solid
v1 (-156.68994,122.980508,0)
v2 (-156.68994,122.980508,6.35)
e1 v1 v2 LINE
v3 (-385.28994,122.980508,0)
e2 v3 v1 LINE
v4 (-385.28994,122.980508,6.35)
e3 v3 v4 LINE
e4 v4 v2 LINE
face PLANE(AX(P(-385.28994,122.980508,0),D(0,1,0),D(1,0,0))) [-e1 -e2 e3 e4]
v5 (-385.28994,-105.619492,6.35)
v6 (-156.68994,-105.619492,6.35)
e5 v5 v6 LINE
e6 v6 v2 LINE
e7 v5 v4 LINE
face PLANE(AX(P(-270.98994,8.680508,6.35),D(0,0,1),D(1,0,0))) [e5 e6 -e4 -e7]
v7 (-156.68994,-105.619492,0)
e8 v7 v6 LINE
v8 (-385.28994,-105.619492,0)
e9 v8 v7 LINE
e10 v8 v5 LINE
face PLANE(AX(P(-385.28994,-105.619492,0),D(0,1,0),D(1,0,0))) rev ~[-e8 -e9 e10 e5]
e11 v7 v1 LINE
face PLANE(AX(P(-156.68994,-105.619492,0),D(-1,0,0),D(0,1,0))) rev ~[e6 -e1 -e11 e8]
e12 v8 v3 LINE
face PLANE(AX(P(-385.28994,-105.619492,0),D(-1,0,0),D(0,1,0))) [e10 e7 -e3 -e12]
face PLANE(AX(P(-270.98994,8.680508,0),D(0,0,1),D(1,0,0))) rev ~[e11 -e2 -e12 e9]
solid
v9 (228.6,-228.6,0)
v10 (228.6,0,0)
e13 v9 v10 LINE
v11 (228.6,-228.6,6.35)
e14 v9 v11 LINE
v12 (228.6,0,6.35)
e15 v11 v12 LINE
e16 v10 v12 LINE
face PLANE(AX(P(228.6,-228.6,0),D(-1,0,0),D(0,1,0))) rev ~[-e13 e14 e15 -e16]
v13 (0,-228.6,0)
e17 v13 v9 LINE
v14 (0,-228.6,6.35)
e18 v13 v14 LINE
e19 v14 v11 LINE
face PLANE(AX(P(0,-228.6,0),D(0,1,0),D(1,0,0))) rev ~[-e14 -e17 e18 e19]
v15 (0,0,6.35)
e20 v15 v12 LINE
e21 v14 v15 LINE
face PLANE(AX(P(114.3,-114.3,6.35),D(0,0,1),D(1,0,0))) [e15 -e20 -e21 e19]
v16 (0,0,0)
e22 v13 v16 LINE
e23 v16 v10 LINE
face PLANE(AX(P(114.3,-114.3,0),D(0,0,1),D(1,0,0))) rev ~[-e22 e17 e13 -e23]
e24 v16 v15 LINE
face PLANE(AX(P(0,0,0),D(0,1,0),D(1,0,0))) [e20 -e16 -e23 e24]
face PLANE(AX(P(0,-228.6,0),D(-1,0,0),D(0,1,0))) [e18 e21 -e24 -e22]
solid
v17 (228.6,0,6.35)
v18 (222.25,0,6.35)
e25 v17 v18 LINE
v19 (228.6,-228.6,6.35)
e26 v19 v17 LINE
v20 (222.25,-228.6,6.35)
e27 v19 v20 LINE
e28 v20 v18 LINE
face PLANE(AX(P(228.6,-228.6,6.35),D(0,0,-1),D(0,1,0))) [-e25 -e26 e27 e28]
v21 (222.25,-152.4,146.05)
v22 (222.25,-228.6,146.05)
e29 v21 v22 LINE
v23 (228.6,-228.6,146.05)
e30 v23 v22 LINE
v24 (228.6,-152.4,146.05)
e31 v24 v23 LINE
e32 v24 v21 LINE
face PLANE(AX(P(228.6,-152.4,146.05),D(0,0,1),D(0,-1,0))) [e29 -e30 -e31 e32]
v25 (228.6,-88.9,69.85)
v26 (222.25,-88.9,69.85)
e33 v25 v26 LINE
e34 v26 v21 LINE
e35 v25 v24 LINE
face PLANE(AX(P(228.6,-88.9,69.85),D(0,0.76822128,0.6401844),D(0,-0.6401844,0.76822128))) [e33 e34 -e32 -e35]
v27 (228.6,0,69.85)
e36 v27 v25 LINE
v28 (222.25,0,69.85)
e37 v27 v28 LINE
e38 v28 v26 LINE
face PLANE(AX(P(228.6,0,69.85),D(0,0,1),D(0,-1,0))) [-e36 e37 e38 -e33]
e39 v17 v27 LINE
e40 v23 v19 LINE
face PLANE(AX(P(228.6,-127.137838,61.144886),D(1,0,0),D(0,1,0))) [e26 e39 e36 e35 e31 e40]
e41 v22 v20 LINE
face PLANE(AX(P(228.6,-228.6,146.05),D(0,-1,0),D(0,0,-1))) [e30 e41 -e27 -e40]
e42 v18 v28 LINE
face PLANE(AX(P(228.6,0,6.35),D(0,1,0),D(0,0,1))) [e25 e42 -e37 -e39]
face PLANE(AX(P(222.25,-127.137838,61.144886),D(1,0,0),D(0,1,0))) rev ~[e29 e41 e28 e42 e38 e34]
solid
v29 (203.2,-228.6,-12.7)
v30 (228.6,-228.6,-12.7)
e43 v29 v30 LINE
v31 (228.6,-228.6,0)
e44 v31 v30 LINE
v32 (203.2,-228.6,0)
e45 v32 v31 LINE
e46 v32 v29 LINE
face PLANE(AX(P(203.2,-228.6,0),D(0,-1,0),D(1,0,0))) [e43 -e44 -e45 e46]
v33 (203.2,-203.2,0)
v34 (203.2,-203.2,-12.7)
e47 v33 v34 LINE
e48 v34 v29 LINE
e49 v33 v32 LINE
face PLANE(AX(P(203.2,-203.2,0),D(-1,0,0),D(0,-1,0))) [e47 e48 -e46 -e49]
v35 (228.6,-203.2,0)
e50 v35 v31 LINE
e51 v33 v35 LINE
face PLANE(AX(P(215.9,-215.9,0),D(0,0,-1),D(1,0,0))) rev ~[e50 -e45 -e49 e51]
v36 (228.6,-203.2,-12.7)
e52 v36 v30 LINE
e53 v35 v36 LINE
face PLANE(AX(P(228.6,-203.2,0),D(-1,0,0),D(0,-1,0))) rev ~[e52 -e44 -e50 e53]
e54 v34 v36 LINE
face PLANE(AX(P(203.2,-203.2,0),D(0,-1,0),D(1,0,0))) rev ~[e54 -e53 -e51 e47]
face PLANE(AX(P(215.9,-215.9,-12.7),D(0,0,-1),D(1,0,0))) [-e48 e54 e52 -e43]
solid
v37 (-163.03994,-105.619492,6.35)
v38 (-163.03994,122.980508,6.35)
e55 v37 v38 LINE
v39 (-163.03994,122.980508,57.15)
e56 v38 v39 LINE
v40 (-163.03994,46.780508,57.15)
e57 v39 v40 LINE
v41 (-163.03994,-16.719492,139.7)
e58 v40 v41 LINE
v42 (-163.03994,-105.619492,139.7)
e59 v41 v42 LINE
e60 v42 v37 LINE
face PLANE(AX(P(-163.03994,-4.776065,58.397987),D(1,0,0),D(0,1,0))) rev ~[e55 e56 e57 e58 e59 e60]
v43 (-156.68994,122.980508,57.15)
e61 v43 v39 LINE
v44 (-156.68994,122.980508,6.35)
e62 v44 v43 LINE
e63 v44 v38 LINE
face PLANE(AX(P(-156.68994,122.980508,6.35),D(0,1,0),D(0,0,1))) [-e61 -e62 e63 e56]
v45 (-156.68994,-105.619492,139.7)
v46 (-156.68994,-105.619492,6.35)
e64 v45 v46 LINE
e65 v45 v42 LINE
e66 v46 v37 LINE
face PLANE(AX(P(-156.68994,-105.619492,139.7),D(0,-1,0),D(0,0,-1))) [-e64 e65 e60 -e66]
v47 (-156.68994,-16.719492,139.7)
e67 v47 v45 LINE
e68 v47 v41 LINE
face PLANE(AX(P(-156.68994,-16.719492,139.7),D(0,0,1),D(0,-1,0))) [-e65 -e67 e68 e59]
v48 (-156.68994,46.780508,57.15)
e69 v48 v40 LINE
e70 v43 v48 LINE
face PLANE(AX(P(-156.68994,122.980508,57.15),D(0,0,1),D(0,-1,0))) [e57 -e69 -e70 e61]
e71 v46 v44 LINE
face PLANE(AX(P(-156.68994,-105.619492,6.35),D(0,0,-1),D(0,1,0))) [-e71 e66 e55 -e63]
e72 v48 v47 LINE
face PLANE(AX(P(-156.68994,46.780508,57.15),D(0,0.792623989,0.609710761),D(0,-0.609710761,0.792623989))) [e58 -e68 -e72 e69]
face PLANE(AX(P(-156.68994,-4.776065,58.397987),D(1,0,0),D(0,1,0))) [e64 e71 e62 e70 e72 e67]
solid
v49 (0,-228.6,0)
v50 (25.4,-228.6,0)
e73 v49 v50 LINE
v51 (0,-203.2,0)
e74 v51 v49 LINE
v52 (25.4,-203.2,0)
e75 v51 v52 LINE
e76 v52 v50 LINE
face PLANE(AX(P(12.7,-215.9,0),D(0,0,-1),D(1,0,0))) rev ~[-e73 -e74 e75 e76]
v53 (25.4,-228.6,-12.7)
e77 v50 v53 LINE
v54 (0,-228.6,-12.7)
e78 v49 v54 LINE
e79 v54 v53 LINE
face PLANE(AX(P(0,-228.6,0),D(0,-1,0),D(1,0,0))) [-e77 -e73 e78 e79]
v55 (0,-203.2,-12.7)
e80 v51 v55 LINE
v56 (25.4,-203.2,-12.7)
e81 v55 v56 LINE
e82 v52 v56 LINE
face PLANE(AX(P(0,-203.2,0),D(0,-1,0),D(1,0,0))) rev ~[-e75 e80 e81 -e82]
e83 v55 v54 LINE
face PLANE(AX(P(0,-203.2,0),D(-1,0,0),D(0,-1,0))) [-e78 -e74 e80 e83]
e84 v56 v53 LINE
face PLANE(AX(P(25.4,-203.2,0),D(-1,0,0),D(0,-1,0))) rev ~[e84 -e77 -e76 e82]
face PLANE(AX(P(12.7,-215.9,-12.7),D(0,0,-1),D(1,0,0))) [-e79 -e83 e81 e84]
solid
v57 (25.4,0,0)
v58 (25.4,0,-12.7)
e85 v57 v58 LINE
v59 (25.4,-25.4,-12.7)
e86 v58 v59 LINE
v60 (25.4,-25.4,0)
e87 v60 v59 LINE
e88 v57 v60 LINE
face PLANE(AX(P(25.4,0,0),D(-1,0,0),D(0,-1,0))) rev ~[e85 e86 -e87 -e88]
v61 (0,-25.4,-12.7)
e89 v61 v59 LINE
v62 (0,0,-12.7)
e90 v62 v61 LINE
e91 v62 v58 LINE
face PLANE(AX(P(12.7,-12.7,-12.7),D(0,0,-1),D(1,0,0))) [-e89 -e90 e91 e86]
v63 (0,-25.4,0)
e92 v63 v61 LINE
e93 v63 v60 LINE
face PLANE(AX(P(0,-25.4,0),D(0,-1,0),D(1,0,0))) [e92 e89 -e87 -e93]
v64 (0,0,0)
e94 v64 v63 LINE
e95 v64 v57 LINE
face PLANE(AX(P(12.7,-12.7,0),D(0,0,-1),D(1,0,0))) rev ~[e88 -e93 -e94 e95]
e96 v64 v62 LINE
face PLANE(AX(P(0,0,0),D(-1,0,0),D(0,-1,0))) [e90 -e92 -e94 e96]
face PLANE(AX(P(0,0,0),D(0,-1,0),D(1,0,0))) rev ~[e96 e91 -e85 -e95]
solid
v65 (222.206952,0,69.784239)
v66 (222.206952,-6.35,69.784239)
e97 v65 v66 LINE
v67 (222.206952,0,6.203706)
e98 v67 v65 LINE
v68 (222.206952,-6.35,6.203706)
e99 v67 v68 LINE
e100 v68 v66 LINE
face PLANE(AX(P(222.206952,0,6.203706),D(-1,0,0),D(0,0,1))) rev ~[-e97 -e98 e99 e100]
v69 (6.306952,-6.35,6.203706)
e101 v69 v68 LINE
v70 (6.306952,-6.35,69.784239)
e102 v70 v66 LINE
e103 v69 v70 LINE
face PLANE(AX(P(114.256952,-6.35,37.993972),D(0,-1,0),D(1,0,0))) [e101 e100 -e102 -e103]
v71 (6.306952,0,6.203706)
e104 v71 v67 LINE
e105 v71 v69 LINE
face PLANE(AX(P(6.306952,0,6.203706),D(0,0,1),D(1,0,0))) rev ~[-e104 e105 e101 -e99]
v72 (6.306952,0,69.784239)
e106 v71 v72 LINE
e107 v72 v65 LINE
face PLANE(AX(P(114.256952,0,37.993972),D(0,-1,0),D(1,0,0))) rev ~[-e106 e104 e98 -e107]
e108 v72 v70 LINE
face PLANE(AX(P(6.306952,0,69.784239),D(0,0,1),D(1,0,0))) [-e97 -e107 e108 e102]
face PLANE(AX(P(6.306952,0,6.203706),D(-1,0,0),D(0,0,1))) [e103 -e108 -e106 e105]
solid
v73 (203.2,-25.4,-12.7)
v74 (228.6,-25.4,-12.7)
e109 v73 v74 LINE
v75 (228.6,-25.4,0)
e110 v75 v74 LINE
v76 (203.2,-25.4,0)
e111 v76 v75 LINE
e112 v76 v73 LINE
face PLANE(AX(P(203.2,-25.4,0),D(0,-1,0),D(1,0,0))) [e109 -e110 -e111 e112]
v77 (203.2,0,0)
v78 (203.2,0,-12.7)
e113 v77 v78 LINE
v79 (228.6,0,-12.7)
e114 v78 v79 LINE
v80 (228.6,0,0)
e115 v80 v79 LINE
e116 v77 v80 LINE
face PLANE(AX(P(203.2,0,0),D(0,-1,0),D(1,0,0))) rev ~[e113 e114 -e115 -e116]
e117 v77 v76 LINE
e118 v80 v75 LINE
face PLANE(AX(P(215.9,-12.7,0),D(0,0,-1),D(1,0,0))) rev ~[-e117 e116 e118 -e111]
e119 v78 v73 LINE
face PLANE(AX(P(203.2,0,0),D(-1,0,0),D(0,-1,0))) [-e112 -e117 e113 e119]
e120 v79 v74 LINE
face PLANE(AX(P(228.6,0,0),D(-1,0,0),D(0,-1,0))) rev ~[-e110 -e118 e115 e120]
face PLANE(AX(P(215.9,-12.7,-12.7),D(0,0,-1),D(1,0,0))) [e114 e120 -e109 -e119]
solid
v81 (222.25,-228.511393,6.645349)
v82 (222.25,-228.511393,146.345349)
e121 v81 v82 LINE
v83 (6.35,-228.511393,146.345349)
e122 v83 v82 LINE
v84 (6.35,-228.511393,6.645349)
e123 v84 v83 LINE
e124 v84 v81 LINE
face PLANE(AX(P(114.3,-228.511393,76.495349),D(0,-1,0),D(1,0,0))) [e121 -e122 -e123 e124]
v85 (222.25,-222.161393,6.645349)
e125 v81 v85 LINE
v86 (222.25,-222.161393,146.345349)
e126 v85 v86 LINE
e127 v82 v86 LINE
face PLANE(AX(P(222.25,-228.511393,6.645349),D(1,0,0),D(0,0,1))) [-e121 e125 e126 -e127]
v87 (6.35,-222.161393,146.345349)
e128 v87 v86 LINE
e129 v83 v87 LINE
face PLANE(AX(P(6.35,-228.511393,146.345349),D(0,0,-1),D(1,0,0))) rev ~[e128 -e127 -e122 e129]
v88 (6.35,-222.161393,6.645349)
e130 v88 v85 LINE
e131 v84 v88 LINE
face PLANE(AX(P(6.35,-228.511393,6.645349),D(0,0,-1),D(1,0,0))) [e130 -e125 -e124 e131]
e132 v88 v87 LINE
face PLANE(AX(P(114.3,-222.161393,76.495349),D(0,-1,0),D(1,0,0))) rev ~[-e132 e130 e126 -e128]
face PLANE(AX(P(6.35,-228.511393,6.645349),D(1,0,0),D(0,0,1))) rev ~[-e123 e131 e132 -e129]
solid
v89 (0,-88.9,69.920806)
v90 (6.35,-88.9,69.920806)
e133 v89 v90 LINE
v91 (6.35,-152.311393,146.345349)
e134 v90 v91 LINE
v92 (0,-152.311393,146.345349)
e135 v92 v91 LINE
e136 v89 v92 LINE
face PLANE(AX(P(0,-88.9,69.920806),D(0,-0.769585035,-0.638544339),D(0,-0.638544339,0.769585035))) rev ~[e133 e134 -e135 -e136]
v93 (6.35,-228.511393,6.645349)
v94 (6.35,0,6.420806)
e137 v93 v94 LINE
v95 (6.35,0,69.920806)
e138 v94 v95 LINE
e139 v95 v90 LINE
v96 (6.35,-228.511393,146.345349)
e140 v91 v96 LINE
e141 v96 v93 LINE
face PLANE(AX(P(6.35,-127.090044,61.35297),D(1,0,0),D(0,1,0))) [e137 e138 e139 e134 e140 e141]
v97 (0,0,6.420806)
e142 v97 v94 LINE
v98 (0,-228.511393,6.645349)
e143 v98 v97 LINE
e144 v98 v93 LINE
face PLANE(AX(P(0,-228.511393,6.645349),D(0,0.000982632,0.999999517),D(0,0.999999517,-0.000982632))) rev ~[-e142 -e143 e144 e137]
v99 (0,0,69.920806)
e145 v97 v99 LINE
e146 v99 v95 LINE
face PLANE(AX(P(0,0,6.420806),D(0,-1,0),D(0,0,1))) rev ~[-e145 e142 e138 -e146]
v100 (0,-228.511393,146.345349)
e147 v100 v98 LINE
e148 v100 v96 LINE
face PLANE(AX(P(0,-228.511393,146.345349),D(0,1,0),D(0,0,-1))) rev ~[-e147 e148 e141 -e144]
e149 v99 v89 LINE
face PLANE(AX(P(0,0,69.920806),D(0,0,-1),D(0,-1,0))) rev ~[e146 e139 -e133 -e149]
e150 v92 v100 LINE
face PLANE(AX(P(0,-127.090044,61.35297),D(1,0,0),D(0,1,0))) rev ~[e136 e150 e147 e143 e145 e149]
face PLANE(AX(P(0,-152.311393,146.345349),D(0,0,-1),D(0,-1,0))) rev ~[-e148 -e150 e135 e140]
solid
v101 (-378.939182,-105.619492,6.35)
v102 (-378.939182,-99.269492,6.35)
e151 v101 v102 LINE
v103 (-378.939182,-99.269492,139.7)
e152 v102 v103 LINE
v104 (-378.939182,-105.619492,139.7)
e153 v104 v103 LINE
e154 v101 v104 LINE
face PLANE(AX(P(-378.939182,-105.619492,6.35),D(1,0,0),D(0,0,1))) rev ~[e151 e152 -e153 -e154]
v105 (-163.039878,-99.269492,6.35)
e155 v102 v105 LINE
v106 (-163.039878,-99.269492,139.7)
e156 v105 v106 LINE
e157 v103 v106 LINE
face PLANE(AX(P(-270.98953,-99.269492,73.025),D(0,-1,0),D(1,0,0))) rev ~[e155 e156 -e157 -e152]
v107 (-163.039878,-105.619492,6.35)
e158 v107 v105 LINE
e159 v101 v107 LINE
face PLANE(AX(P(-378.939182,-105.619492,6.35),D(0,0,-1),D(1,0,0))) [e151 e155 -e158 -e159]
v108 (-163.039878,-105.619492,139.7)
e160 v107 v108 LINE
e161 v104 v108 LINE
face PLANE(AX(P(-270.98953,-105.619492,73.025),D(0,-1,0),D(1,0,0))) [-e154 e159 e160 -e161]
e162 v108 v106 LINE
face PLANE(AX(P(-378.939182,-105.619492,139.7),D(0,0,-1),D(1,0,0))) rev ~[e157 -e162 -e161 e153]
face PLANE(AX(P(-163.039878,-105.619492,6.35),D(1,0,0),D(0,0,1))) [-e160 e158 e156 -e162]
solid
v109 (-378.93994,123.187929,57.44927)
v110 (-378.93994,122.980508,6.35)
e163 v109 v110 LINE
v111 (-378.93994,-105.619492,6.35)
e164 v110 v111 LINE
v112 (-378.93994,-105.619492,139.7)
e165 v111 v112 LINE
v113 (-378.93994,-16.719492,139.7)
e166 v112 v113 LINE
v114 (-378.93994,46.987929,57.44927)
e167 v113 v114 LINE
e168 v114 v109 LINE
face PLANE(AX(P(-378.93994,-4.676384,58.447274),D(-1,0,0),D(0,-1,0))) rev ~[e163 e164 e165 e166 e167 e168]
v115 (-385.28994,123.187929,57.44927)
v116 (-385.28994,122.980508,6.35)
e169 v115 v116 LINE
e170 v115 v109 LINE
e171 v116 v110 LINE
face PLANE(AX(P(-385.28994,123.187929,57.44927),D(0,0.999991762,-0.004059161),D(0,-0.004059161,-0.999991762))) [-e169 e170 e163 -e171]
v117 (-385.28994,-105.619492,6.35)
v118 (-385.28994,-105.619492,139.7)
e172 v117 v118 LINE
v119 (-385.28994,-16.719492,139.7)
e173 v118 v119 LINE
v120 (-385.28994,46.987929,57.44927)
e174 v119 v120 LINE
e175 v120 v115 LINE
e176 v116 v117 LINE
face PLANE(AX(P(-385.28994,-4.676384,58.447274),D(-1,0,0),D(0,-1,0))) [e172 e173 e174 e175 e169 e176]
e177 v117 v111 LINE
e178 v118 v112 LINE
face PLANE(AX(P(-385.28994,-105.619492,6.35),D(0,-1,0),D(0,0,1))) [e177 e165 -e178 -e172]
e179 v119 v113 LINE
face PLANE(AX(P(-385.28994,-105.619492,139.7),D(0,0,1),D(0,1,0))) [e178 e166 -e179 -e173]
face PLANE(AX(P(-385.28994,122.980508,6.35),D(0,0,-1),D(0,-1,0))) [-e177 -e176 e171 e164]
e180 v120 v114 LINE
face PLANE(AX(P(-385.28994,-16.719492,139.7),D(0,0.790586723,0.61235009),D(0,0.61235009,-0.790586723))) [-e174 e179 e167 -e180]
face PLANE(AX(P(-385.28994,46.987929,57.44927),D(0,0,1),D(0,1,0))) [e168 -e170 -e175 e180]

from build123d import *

# Parameters (mm, degrees)
F0_W      = 228.6
F0_H      = 228.6
F1_DEPTH  = 6.35
F2_W      = 25.4
F2_H      = 25.4
F3_DEPTH  = 12.7
F5_DEPTH  = 6.35
F7_DEPTH  = 6.35
F8_W      = 215.9
F8_H      = 63.5805330239
F9_DEPTH  = 6.35
F10_W     = 215.9
F10_H     = 139.7
F11_DEPTH = 6.35
F12_W     = 228.6
F12_H     = 228.6
F13_DEPTH = 6.35
F15_DEPTH = 6.35
F17_DEPTH = 6.35
F18_W     = 215.8993035555
F18_H     = 133.35
F19_DEPTH = 6.35


# Not quite as in the source:
# - a feature names something its author has since deleted; it is built from what else it names


with BuildPart() as f1:
    # F0 (on Top) → F1 (new body)
    with BuildSketch(Plane.XY):
        with Locations((114.3, -114.3)):
            Rectangle(F0_W, F0_H)
    extrude(amount=F1_DEPTH)


with BuildPart() as f3:
    # F2 (on face) → F3 (new body)
    with BuildSketch(Plane(origin=(0, 0, 0), x_dir=(1, 0, 0), z_dir=(0, 0, -1))):
        with Locations((12.7, 215.9)):
            Rectangle(F2_W, F2_H)
    extrude(amount=F3_DEPTH)


with BuildPart() as f3b:
    # F2 (on face) → F3, piece 2 (new body)
    with BuildSketch(Plane(origin=(0, 0, 0), x_dir=(1, 0, 0), z_dir=(0, 0, -1))):
        with Locations((215.9, 215.9)):
            Rectangle(F2_W, F2_H)
    extrude(amount=F3_DEPTH)


with BuildPart() as f3c:
    # F2 (on face) → F3, piece 3 (new body)
    with BuildSketch(Plane(origin=(0, 0, 0), x_dir=(1, 0, 0), z_dir=(0, 0, -1))):
        with Locations((12.7, 12.7)):
            Rectangle(F2_W, F2_H)
    extrude(amount=F3_DEPTH)


with BuildPart() as f3d:
    # F2 (on face) → F3, piece 4 (new body)
    with BuildSketch(Plane(origin=(0, 0, 0), x_dir=(1, 0, 0), z_dir=(0, 0, -1))):
        with Locations((215.9, 12.7)):
            Rectangle(F2_W, F2_H)
    extrude(amount=F3_DEPTH)


with BuildPart() as f5:
    # F4 (on Right) → F5 (new body)
    with BuildSketch(Plane.YZ):
        Polygon((-228.5113930702, 146.3453488544), (-228.5113930702, 6.6453488544), (0, 6.4208060503), (0, 69.9208060503), (-88.9, 69.9208060503), (-152.3113930702, 146.3453488544), align=None)
    extrude(amount=F5_DEPTH)


with BuildPart() as f7:
    # F6 (on face) → F7 (new body)
    with BuildSketch(Plane.YZ.offset(228.6)):
        Polygon((-228.6, 6.35), (0, 6.35), (0, 69.85), (-88.9, 69.85), (-152.4, 146.05), (-228.6, 146.05), align=None)
    extrude(amount=-F7_DEPTH)


with BuildPart() as f9:
    # F8 (on Front) → F9 (new body)
    with BuildSketch(Plane.XZ):
        with Locations((114.2569518656, 37.9939724226)):
            Rectangle(F8_W, F8_H)
    extrude(amount=F9_DEPTH)


with BuildPart() as f11:
    # F10 (on face) → F11 (new body)
    with BuildSketch(Plane.XZ.offset(228.5113930702)):
        with Locations((114.3, 76.4953488544)):
            Rectangle(F10_W, F10_H)
    extrude(amount=-F11_DEPTH)


with BuildPart() as f13:
    # F12 (on Top) → F13 (new body)
    with BuildSketch(Plane.XY):
        with Locations((-270.9899397628, 8.6805075407)):
            Rectangle(F12_W, F12_H)
    extrude(amount=F13_DEPTH)


with BuildPart() as f15:
    # F14 (on face) → F15 (new body)
    with BuildSketch(Plane(origin=(-385.2899397628, 0, 0), x_dir=(0, -1, 0), z_dir=(-1, 0, 0))):
        Polygon((-46.9879293919, 57.4492700398), (-123.1879293919, 57.4492700398), (-122.9805075407, 6.35), (105.6194924593, 6.35), (105.6194924593, 139.7), (16.7194924593, 139.7), align=None)
    extrude(amount=-F15_DEPTH)


with BuildPart() as f17:
    # F16 (on face) → F17 (new body)
    with BuildSketch(Plane.YZ.offset(-156.6899397628)):
        Polygon((-105.6194924593, 6.35), (122.9805075407, 6.35), (122.9805075407, 57.15), (46.7805075407, 57.15), (-16.7194924593, 139.7), (-105.6194924593, 139.7), align=None)
    extrude(amount=-F17_DEPTH)


with BuildPart() as f19:
    # F18 (on face) → F19 (new body)
    with BuildSketch(Plane.XZ.offset(105.6194924593)):
        with Locations((-270.9895297885, 73.025)):
            Rectangle(F18_W, F18_H)
    extrude(amount=-F19_DEPTH)


solid = Compound([f1.part, f3.part, f3b.part, f3c.part, f3d.part, f5.part, f7.part, f9.part, f11.part, f13.part, f15.part, f17.part, f19.part])
